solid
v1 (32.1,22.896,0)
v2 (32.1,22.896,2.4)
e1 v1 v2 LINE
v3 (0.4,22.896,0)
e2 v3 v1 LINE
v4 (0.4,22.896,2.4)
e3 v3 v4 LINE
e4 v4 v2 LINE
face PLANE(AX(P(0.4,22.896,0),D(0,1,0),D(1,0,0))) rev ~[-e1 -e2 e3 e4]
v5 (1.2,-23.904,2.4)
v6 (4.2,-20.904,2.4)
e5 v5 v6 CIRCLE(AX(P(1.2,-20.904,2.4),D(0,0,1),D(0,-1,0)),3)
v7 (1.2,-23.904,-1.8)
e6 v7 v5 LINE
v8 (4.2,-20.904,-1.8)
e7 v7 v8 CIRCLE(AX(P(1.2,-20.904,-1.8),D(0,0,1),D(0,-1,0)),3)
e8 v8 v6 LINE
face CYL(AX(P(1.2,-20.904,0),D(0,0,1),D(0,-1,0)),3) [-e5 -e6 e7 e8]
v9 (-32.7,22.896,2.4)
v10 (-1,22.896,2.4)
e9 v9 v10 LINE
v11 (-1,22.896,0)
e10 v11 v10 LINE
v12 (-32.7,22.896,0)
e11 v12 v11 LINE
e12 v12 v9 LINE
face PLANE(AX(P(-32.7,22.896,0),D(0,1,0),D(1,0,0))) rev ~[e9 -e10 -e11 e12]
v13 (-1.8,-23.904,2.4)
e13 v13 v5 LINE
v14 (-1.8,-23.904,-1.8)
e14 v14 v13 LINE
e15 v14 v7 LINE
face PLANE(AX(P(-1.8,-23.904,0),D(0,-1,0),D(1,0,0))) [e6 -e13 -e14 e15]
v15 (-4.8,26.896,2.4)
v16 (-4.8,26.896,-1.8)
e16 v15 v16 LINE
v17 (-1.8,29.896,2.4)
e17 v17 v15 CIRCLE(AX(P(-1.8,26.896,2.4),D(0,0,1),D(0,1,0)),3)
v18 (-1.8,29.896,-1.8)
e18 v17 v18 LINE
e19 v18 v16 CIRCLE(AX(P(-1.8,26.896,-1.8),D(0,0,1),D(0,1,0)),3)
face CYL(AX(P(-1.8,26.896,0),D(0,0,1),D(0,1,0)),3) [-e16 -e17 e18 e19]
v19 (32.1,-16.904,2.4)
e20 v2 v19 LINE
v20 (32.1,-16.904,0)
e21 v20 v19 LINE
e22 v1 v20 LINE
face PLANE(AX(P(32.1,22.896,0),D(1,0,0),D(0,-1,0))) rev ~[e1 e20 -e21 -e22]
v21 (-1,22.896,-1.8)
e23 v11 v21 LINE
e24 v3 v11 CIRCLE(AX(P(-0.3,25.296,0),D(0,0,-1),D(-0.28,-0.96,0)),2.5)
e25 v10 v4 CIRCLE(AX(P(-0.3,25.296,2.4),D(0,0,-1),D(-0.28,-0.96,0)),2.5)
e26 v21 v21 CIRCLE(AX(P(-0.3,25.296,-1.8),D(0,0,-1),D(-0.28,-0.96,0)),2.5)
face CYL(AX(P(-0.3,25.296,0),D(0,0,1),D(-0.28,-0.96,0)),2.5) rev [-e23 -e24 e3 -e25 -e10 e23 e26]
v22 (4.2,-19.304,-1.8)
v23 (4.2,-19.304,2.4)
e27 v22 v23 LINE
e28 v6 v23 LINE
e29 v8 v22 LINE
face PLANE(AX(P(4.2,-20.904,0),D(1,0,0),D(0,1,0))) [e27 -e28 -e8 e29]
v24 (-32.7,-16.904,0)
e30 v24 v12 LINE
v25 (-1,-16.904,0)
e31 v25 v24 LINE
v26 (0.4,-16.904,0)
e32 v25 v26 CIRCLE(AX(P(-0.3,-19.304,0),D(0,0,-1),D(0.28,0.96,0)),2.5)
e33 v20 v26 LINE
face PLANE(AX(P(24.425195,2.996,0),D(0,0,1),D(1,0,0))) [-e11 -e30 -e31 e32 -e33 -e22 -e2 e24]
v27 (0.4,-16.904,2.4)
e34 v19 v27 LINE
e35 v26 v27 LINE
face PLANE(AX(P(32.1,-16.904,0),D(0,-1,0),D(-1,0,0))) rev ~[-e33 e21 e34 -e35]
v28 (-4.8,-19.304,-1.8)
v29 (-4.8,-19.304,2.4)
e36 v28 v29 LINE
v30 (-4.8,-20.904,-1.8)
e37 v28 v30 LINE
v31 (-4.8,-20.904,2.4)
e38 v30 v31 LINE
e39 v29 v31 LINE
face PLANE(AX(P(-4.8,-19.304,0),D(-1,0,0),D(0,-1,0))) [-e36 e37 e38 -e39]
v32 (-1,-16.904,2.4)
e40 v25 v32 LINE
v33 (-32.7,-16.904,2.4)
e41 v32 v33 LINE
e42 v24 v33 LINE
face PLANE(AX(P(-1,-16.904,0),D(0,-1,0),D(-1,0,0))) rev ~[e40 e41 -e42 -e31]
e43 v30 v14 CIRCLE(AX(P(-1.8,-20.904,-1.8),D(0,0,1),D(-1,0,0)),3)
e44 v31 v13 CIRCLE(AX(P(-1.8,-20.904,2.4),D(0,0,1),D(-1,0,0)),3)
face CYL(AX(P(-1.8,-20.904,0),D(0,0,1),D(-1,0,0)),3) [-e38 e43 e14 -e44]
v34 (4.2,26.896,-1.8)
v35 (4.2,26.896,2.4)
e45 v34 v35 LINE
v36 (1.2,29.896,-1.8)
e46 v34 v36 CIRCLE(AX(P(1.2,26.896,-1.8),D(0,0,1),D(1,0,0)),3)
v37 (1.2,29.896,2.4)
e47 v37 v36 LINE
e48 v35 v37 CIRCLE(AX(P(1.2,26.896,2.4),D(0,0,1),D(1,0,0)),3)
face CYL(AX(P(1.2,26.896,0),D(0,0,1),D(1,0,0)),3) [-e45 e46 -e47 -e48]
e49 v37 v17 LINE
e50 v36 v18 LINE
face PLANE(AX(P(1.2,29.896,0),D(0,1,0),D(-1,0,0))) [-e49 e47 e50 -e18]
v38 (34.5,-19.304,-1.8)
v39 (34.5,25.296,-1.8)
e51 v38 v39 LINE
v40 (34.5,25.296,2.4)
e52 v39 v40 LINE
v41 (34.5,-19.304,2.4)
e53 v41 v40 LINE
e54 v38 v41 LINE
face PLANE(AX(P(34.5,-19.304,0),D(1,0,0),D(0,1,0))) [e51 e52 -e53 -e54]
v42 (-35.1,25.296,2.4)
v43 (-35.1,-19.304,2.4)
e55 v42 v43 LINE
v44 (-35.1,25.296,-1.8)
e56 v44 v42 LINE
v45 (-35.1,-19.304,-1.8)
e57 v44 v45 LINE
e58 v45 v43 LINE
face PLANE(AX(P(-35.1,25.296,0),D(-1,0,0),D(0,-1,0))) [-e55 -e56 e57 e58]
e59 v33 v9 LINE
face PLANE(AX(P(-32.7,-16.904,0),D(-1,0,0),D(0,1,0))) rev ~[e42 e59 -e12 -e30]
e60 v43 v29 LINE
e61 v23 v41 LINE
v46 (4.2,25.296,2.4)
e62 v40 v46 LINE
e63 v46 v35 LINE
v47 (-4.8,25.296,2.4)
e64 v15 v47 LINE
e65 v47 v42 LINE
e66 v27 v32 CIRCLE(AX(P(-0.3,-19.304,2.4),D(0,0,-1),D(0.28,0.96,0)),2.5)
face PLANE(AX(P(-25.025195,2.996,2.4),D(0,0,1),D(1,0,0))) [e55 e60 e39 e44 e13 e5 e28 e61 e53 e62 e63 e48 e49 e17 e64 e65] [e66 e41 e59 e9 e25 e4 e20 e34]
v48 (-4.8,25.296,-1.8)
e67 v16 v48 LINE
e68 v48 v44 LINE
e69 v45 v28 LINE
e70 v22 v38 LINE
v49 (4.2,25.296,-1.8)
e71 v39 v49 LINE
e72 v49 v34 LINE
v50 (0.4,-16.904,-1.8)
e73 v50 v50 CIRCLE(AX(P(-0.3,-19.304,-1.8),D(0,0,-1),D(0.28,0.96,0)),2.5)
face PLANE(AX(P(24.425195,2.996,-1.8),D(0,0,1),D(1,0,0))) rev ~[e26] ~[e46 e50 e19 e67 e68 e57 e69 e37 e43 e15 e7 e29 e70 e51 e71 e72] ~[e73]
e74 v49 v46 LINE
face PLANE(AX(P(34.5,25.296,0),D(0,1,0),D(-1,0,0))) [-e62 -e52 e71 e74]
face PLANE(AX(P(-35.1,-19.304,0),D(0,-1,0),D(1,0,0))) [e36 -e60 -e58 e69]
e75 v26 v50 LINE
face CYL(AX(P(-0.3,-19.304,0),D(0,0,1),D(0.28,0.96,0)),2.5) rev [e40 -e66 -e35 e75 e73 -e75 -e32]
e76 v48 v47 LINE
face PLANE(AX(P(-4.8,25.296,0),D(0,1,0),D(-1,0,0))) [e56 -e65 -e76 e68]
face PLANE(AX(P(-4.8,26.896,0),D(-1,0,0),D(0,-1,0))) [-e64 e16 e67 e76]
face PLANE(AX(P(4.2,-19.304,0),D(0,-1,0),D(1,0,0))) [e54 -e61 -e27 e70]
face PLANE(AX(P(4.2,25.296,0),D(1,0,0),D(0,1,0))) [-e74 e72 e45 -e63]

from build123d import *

# Parameters (mm, degrees)
F1_DEPTH = 2.4
F0_W     = 60
F0_H     = 35
F2_DEPTH = 1.8


# Not quite as in the source:
# - ends of sketch curves that miss each other by under 0.0002 mm in the source are joined


with BuildPart() as f1:
    # F0 (on Top) → F1 (new body)
    with BuildSketch(Plane.XY):
        Polygon((-32.7, -16.904), (-32.7, 22.896), (-4.8, 22.896), (-4.8, 25.2960002601), (-35.1000002601, 25.2960002601), (-35.1000002601, -19.3040002601), (-4.8, -19.3040002601), (-4.8, -16.904), align=None)
        Polygon((4.2, 25.2960002601), (4.2, 22.896), (32.1, 22.896), (32.1, -16.904), (4.2, -16.904), (4.2, -19.3040002601), (34.5000002601, -19.3040002601), (34.5000002601, 25.2960002601), align=None)
        with BuildLine():
            ThreePointArc((2.2, 25.296), (1.7, 23.796), (0.4, 22.896))
            Line((0.4, 22.896), (4.2, 22.896))
            Line((4.2, 22.896), (4.2, 25.2960002601))
            Line((4.2, 25.2960002601), (2.2, 25.296))
        make_face()
        with BuildLine():
            Line((-4.8, 25.2960002601), (-4.8, 22.896))
            Line((-4.8, 22.896), (-1, 22.896))
            ThreePointArc((-1, 22.896), (-2.300000078, 23.796000104), (-2.8, 25.2960002601))
            Line((-2.8, 25.2960002601), (-4.8, 25.2960002601))
        make_face()
        with BuildLine():
            Line((-4.8, 26.896), (-4.8, 25.2960002601))
            Line((-4.8, 25.2960002601), (-2.8, 25.2960002601))
            ThreePointArc((-2.8, 25.2960002601), (-0.2999998699, 27.796), (2.2, 25.296))
            Line((2.2, 25.296), (4.2, 25.2960002601))
            Line((4.2, 25.2960002601), (4.2, 26.896))
            ThreePointArc((4.2, 26.896), (3.3213203436, 29.0173203436), (1.2, 29.896))
            Line((1.2, 29.896), (-1.8, 29.896))
            ThreePointArc((-1.8, 29.896), (-3.9213203436, 29.0173203436), (-4.8, 26.896))
        make_face()
        with BuildLine():
            Line((-1, -16.904), (-4.8, -16.904))
            Line((-4.8, -16.904), (-4.8, -19.3040002601))
            Line((-4.8, -19.3040002601), (-4.8, -20.904))
            ThreePointArc((-4.8, -20.904), (-3.9213203436, -23.0253203436), (-1.8, -23.904))
            Line((-1.8, -23.904), (1.2, -23.904))
            ThreePointArc((1.2, -23.904), (3.3213203436, -23.0253203436), (4.2, -20.904))
            Line((4.2, -20.904), (4.2, -19.3040002601))
            Line((4.2, -19.3040002601), (4.2, -16.904))
            Line((4.2, -16.904), (0.4, -16.904))
            ThreePointArc((0.4, -16.904), (1.7, -17.804), (2.2, -19.304))
            ThreePointArc((2.2, -19.304), (-1.8, -21.304), (-1, -16.904))
        make_face()
    extrude(amount=F1_DEPTH)

    # F0 (on Top) → F2 (join)
    with BuildSketch(Plane.XY):
        Polygon((4.2, 25.2960002601), (4.2, 22.896), (32.1, 22.896), (32.1, -16.904), (4.2, -16.904), (4.2, -19.3040002601), (34.5000002601, -19.3040002601), (34.5000002601, 25.2960002601), align=None)
        with BuildLine():
            Line((-4.8, 22.896), (-32.7, 22.896))
            Line((-32.7, 22.896), (-32.7, -16.904))
            Line((-32.7, -16.904), (-4.8, -16.904))
            Line((-4.8, -16.904), (-1, -16.904))
            ThreePointArc((-1, -16.904), (-0.3, -16.804), (0.4, -16.904))
            Line((0.4, -16.904), (4.2, -16.904))
            Line((4.2, -16.904), (32.1, -16.904))
            Line((32.1, -16.904), (32.1, 22.896))
            Line((32.1, 22.896), (4.2, 22.896))
            Line((4.2, 22.896), (0.4, 22.896))
            ThreePointArc((0.4, 22.896), (-0.3, 22.796), (-1, 22.896))
            Line((-1, 22.896), (-4.8, 22.896))
        make_face()
        with Locations((-0.3, 2.996)):
            Rectangle(F0_W, F0_H, mode=Mode.SUBTRACT)
        with Locations((-0.3, 2.996)):
            Rectangle(F0_W, F0_H)
        Polygon((-32.7, -16.904), (-32.7, 22.896), (-4.8, 22.896), (-4.8, 25.2960002601), (-35.1000002601, 25.2960002601), (-35.1000002601, -19.3040002601), (-4.8, -19.3040002601), (-4.8, -16.904), align=None)
        with BuildLine():
            Line((-1, -16.904), (-4.8, -16.904))
            Line((-4.8, -16.904), (-4.8, -19.3040002601))
            Line((-4.8, -19.3040002601), (-4.8, -20.904))
            ThreePointArc((-4.8, -20.904), (-3.9213203436, -23.0253203436), (-1.8, -23.904))
            Line((-1.8, -23.904), (1.2, -23.904))
            ThreePointArc((1.2, -23.904), (3.3213203436, -23.0253203436), (4.2, -20.904))
            Line((4.2, -20.904), (4.2, -19.3040002601))
            Line((4.2, -19.3040002601), (4.2, -16.904))
            Line((4.2, -16.904), (0.4, -16.904))
            ThreePointArc((0.4, -16.904), (1.7, -17.804), (2.2, -19.304))
            ThreePointArc((2.2, -19.304), (-1.8, -21.304), (-1, -16.904))
        make_face()
        with BuildLine():
            Line((-4.8, 26.896), (-4.8, 25.2960002601))
            Line((-4.8, 25.2960002601), (-2.8, 25.2960002601))
            ThreePointArc((-2.8, 25.2960002601), (-0.2999998699, 27.796), (2.2, 25.296))
            Line((2.2, 25.296), (4.2, 25.2960002601))
            Line((4.2, 25.2960002601), (4.2, 26.896))
            ThreePointArc((4.2, 26.896), (3.3213203436, 29.0173203436), (1.2, 29.896))
            Line((1.2, 29.896), (-1.8, 29.896))
            ThreePointArc((-1.8, 29.896), (-3.9213203436, 29.0173203436), (-4.8, 26.896))
        make_face()
        with BuildLine():
            ThreePointArc((2.2, 25.296), (1.7, 23.796), (0.4, 22.896))
            Line((0.4, 22.896), (4.2, 22.896))
            Line((4.2, 22.896), (4.2, 25.2960002601))
            Line((4.2, 25.2960002601), (2.2, 25.296))
        make_face()
        with BuildLine():
            Line((-4.8, 25.2960002601), (-4.8, 22.896))
            Line((-4.8, 22.896), (-1, 22.896))
            ThreePointArc((-1, 22.896), (-2.300000078, 23.796000104), (-2.8, 25.2960002601))
            Line((-2.8, 25.2960002601), (-4.8, 25.2960002601))
        make_face()
    extrude(amount=-F2_DEPTH)


solid = f1.part
